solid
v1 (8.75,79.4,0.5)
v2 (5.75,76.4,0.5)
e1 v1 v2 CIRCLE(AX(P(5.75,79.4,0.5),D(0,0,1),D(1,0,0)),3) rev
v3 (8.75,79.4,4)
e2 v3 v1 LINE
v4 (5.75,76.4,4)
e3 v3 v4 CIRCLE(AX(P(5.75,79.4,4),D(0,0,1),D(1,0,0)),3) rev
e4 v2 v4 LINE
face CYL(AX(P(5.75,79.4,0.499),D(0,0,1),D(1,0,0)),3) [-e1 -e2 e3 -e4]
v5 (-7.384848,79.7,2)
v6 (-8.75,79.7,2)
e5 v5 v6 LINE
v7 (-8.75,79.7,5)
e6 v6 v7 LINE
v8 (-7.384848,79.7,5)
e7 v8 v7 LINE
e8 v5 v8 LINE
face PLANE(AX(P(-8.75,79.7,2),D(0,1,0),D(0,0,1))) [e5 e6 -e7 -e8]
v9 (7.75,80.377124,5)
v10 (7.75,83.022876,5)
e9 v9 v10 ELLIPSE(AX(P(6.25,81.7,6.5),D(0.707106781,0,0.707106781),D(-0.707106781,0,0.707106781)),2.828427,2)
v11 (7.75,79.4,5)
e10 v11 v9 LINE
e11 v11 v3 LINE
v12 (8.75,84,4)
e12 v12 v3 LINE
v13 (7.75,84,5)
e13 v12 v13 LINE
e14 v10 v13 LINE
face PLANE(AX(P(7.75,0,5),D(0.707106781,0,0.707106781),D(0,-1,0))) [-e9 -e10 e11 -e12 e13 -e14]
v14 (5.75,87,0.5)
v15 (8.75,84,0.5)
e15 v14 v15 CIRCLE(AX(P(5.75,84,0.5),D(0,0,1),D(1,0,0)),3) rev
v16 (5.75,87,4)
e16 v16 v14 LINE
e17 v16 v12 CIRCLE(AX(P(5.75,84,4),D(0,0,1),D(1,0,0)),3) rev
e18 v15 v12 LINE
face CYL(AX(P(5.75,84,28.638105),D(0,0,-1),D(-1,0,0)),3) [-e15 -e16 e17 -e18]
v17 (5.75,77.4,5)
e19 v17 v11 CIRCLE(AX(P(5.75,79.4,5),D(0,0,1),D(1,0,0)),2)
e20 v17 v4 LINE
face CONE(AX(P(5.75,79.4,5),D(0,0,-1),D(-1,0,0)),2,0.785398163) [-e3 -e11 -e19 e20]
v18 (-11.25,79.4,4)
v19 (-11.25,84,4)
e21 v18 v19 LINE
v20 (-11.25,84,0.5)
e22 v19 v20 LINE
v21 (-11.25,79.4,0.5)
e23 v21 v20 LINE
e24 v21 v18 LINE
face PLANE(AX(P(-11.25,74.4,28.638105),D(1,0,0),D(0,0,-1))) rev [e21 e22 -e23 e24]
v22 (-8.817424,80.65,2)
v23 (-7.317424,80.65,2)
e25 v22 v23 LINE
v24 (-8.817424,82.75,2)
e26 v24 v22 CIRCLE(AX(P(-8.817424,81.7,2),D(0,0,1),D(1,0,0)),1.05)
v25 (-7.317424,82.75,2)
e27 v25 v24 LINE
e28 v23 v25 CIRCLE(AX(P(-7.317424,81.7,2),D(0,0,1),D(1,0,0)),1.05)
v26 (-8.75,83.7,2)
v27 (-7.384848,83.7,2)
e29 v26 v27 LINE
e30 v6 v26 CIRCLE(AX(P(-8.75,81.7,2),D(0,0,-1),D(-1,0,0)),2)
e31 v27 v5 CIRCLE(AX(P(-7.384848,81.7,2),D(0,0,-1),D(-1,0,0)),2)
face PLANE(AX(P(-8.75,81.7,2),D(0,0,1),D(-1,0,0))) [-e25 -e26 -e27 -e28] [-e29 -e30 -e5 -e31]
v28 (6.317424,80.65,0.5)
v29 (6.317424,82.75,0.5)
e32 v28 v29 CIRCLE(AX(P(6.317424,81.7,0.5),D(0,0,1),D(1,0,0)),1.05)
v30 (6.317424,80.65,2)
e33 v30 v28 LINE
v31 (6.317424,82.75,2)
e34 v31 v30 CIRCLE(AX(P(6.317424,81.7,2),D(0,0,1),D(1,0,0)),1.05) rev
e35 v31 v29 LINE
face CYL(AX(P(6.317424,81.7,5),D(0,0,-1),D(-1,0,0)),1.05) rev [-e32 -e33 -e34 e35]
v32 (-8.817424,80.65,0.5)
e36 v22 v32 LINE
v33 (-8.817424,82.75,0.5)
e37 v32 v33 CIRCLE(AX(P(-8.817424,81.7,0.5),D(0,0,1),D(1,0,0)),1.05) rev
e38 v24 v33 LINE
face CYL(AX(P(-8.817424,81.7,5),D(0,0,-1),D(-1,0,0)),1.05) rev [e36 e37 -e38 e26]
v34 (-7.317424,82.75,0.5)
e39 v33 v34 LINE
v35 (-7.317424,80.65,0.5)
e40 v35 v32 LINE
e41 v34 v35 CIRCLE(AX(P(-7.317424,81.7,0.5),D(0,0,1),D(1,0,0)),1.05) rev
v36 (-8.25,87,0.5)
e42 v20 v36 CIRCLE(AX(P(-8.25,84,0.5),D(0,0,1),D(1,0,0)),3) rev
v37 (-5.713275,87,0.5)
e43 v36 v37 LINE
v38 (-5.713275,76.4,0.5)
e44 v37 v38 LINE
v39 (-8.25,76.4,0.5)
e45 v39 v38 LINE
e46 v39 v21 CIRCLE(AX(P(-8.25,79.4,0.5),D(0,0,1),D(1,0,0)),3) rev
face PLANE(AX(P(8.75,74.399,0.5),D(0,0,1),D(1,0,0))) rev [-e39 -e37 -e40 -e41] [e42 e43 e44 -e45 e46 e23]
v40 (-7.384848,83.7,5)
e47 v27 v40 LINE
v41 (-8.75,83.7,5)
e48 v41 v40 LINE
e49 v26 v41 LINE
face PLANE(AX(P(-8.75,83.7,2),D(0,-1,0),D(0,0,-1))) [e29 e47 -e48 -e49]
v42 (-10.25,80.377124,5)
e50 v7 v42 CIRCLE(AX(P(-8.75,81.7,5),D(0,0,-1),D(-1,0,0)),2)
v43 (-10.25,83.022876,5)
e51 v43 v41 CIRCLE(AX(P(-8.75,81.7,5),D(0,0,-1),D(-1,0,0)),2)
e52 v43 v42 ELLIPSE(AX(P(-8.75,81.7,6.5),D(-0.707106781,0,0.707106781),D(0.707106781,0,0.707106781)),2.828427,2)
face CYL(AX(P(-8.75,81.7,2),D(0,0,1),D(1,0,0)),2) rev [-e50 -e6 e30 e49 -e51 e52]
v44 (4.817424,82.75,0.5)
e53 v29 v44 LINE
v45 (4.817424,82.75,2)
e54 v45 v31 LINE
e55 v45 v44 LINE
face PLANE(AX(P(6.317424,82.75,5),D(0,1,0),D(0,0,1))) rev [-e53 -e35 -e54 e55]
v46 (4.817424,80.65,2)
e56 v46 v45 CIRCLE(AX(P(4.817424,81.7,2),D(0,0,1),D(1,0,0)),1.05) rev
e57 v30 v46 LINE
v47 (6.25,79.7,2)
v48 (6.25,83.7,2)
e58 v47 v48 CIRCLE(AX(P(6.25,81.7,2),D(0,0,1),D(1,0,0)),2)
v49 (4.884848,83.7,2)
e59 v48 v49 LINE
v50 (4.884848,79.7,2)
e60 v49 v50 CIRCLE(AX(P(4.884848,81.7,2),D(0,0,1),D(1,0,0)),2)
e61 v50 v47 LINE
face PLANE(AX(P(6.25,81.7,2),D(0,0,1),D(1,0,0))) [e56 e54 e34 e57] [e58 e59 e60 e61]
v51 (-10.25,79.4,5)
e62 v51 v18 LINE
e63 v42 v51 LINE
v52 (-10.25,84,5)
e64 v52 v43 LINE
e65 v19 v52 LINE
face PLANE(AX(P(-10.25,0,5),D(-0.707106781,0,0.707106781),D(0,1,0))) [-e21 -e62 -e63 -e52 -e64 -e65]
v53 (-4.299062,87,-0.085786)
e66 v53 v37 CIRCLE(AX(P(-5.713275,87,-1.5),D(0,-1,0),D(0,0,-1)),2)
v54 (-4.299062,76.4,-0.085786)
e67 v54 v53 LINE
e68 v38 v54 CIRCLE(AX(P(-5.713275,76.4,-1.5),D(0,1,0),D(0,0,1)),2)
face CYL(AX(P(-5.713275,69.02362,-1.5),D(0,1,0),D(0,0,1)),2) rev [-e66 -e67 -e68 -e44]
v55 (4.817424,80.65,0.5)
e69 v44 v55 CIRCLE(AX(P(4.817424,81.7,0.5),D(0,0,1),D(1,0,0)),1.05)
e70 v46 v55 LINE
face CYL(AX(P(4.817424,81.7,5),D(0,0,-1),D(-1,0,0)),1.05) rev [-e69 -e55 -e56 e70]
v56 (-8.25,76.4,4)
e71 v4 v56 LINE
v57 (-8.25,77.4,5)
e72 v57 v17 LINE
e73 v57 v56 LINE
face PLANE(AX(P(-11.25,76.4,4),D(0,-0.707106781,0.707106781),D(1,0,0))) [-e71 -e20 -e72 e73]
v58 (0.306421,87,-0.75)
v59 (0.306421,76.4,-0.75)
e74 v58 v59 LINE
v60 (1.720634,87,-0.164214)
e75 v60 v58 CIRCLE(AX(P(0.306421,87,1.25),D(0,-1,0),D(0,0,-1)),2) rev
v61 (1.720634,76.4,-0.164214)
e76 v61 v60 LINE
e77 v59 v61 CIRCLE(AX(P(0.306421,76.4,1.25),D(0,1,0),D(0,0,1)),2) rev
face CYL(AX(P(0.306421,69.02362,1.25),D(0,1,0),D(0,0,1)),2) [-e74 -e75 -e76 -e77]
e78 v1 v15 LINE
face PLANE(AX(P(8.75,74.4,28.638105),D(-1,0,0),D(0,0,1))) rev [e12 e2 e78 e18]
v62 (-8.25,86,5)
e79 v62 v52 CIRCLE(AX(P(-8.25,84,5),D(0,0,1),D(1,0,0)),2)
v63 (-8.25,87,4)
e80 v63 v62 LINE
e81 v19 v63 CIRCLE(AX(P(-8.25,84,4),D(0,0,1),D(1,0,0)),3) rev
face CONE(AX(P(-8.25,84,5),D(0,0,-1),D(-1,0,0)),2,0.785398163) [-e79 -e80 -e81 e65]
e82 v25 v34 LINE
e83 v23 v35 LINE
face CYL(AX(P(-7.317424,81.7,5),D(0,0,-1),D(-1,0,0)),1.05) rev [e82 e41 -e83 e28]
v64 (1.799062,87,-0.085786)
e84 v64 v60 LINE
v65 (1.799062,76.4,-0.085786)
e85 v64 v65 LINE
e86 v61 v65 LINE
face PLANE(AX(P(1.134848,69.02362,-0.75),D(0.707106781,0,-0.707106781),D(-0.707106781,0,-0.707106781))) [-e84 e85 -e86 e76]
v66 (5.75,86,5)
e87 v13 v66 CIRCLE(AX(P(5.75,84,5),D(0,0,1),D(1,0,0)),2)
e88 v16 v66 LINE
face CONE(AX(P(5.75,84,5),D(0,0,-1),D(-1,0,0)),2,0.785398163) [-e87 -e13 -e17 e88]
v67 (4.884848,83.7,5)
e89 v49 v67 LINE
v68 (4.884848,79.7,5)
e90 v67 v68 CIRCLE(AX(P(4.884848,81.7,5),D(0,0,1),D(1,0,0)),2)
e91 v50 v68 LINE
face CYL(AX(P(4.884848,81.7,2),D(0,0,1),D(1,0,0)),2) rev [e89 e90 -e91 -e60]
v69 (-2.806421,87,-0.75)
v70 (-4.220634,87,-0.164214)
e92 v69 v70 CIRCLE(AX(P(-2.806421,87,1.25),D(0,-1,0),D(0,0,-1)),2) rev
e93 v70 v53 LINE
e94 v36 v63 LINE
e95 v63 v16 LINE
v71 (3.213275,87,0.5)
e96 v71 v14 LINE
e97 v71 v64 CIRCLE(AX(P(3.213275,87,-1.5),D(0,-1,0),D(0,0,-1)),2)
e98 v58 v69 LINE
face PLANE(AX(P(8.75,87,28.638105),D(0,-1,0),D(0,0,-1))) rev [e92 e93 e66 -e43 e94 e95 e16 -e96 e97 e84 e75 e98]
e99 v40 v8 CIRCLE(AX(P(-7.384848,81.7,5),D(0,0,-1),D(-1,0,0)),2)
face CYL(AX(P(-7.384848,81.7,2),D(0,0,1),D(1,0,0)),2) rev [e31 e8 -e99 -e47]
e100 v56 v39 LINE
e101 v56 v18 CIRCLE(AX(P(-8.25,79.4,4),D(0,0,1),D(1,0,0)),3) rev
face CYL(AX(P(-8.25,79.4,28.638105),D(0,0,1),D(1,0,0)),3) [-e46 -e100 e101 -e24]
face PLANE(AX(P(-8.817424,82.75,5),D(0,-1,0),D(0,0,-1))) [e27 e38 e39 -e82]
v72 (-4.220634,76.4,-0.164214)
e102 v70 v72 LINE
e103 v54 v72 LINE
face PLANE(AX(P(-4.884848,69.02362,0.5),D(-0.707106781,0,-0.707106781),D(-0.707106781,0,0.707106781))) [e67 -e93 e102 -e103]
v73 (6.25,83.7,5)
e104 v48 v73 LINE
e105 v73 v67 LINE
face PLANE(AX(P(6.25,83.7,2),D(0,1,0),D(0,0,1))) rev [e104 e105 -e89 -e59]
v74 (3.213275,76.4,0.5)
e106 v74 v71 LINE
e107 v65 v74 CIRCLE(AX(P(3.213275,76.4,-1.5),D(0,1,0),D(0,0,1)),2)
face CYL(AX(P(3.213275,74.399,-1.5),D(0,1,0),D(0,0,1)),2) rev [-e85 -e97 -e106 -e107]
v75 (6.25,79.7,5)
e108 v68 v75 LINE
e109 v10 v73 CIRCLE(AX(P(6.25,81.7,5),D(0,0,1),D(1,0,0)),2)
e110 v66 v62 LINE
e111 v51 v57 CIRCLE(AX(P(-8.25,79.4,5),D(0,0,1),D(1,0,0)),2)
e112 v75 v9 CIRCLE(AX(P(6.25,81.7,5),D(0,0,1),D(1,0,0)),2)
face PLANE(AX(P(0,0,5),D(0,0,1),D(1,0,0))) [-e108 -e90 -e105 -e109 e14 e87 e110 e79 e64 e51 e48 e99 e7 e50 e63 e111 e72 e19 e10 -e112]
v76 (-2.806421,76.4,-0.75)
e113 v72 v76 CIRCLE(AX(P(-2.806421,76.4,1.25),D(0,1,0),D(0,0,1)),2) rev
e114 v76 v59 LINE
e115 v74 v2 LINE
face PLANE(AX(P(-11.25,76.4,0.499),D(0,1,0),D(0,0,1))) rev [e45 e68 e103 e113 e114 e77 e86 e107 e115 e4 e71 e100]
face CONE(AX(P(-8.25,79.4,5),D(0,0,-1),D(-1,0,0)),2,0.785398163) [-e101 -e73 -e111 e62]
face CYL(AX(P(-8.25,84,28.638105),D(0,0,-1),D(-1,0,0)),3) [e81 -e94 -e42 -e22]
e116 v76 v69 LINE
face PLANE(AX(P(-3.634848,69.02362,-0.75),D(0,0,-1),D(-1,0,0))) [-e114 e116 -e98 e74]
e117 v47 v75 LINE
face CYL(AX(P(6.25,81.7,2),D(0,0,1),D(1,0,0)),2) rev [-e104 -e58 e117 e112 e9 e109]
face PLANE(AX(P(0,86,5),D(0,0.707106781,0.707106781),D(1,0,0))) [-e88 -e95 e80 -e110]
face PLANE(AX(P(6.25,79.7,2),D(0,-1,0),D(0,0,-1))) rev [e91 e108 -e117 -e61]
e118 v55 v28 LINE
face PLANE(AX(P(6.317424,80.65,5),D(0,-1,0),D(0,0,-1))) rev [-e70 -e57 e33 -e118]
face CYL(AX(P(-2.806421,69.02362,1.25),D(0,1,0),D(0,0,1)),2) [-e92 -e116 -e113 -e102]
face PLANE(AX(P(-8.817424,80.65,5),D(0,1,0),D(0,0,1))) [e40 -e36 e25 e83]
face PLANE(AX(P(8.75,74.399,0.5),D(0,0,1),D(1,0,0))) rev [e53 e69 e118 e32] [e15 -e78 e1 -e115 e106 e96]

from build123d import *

# Parameters (mm, degrees)
SKETCH1_W           = 20
SKETCH1_H           = 12.6
BOSS_EXTRUDE1_DEPTH = 5
CUT_EXTRUDE1_REACH  = 19.616
SKETCH2_W           = 20
SKETCH2_H           = 0.5
CUT_EXTRUDE2_REACH  = 89.84
SKETCH3_W           = 20
SKETCH3_H           = 2
BOSS_EXTRUDE2_DEPTH = 10.6
CUT_EXTRUDE4_DEPTH  = 88.839697745
FILLET1_R           = 3
CUT_EXTRUDE5_DEPTH  = 3
CHAMFER2_SIZE       = 1
FILLET2_R           = 2


with BuildPart() as part:
    # Sketch1 → Boss-Extrude1 (new body)
    with BuildSketch(Plane.XY):
        with Locations((-1.25, 80.7)):
            Rectangle(SKETCH1_W, SKETCH1_H)
    extrude(amount=BOSS_EXTRUDE1_DEPTH)

    # Sketch2 → Cut-Extrude1 (cut, up to next)
    with BuildSketch(Plane(origin=(0, 87, 0), x_dir=(1, 0, 0), z_dir=(0, 1, 0)), mode=Mode.PRIVATE) as cut_extrude1_sk1:
        with Locations((-1.25, -0.25)):
            Rectangle(SKETCH2_W, SKETCH2_H)
    cut_extrude1_tool1 = extrude(cut_extrude1_sk1.sketch, amount=-CUT_EXTRUDE1_REACH, mode=Mode.PRIVATE) & part.part
    add(cut_extrude1_tool1.solids().sort_by_distance((-1.25, 87, 0.25))[0], mode=Mode.SUBTRACT)

    # Sketch3 → Cut-Extrude2 (cut, up to next)
    with BuildSketch(Plane.XY.offset(5), mode=Mode.PRIVATE) as cut_extrude2_sk1:
        with Locations((-1.25, 75.4)):
            Rectangle(SKETCH3_W, SKETCH3_H)
    cut_extrude2_tool1 = extrude(cut_extrude2_sk1.sketch, amount=-CUT_EXTRUDE2_REACH, mode=Mode.PRIVATE) & part.part
    add(cut_extrude2_tool1.solids().sort_by_distance((-1.25, 75.4, 5))[0], mode=Mode.SUBTRACT)

    # Sketch4 → Boss-Extrude2 (add)
    with BuildSketch(Plane(origin=(0, 87, 0), x_dir=(1, 0, 0), z_dir=(0, 1, 0))):
        Polygon((-4.884848004, -0.5), (-3.634848004, 0.75), (1.134848004, 0.75), (2.384848004, -0.5), align=None)
    extrude(amount=-BOSS_EXTRUDE2_DEPTH)

    # Sketch6 → Cut-Extrude4 (cut, symmetric)
    with BuildSketch(Plane(origin=(0, 0, 0.5), x_dir=(-1, 0, 0), z_dir=(0, 0, -1))):
        with BuildLine():
            Line((-6.317424002, 82.75), (-4.817424002, 82.75))
            ThreePointArc((-4.817424002, 82.75), (-3.767424002, 81.7), (-4.817424002, 80.65))
            Line((-4.817424002, 80.65), (-6.317424002, 80.65))
            ThreePointArc((-6.317424002, 80.65), (-7.367424002, 81.7), (-6.317424002, 82.75))
        make_face()
    cut_extrude4 = extrude(amount=CUT_EXTRUDE4_DEPTH, both=True, mode=Mode.SUBTRACT)

    # Fillet1
    fillet1_edges = [part.edges().sort_by_distance(p)[0] for p in [
        (-11.25, 87, 2.75),
        (-11.25, 76.4, 2.75),
        (8.75, 76.4, 2.75),
        (8.75, 87, 2.75),
    ]]
    fillet(fillet1_edges, radius=FILLET1_R)

    # Sketch7 → Cut-Extrude5 (cut)
    with BuildSketch(Plane.XY.offset(5)):
        with BuildLine():
            Line((6.25, 79.7), (4.884848004, 79.7))
            ThreePointArc((4.884848004, 79.7), (2.884848004, 81.7), (4.884848004, 83.7))
            Line((4.884848004, 83.7), (6.25, 83.7))
            ThreePointArc((6.25, 83.7), (8.25, 81.7), (6.25, 79.7))
        make_face()
    cut_extrude5 = extrude(amount=-CUT_EXTRUDE5_DEPTH, mode=Mode.SUBTRACT)

    # Mirror1: Cut-Extrude4, Cut-Extrude5 across plane
    add(cut_extrude4.mirror(Plane(origin=(-1.25, 0, 0), x_dir=(0, 0, 1), z_dir=(1, 0, 0))), mode=Mode.SUBTRACT)
    add(cut_extrude5.mirror(Plane(origin=(-1.25, 0, 0), x_dir=(0, 0, 1), z_dir=(1, 0, 0))), mode=Mode.SUBTRACT)

    # Chamfer2
    # the kernel refuses this chamfer: 1 mm, written as the material it takes off along each edge
    with BuildSketch(Plane(origin=(5.75, 76.4, 5), x_dir=(0, -0.02749587661058217, -0.9996219169112968), z_dir=(-1, 0, 0)), Plane(origin=(-8.25, 87, 5), x_dir=(0, 0.02749587661058217, -0.9996219169112968), z_dir=(1, 0, 0))) as chamfer2_piece_1:
        Polygon((CHAMFER2_SIZE * 0.999621916911, -CHAMFER2_SIZE * 0.0274958766106), (-CHAMFER2_SIZE * 0.0274958766106, -CHAMFER2_SIZE * 0.999621916911), (0, 0), align=None)
    extrude(amount=14, mode=Mode.SUBTRACT)
    with BuildSketch(Plane(origin=(8.75, 84, 5), x_dir=(-0.9996219169112968, 0, 0.02749587661058651), z_dir=(0, -1, 0))) as chamfer2_piece_2:
        Polygon((CHAMFER2_SIZE * 0.999621916911, CHAMFER2_SIZE * 0.0274958766106), (-CHAMFER2_SIZE * 0.0274958766106, CHAMFER2_SIZE * 0.999621916911), (0, 0), align=None)
    extrude(amount=4.6, mode=Mode.SUBTRACT)
    with BuildSketch(Plane(origin=(-11.25, 79.4, 5), x_dir=(-0.027495876610585623, 0, -0.9996219169112968), z_dir=(0, 1, 0))) as chamfer2_piece_3:
        Polygon((CHAMFER2_SIZE * 0.999621916911, -CHAMFER2_SIZE * 0.0274958766106), (-CHAMFER2_SIZE * 0.0274958766106, -CHAMFER2_SIZE * 0.999621916911), (0, 0), align=None)
    extrude(amount=4.6, mode=Mode.SUBTRACT)
    with BuildSketch(Plane(origin=(5.75, 84, 5), x_dir=(0, 1, 0), z_dir=(-1, 0, 0))) as chamfer2_piece_4:
        Polygon((3 - CHAMFER2_SIZE, 0), (3, CHAMFER2_SIZE), (3, 0), align=None)
    revolve(axis=Axis((5.75, 84, 5), (0, 0, -1)), revolution_arc=90, mode=Mode.SUBTRACT)
    with BuildSketch(Plane(origin=(-8.25, 84, 5), x_dir=(0, 1, 0), z_dir=(1, 0, 0))) as chamfer2_piece_5:
        Polygon((3, -CHAMFER2_SIZE), (3 - CHAMFER2_SIZE, 0), (3, 0), align=None)
    revolve(axis=Axis((-8.25, 84, 5), (0, 0, 1)), revolution_arc=90, mode=Mode.SUBTRACT)
    with BuildSketch(Plane(origin=(-8.25, 79.4, 5), x_dir=(0, -1, 0), z_dir=(1, 0, 0))) as chamfer2_piece_6:
        Polygon((3, CHAMFER2_SIZE), (3 - CHAMFER2_SIZE, 0), (3, 0), align=None)
    revolve(axis=Axis((-8.25, 79.4, 5), (0, 0, -1)), revolution_arc=90, mode=Mode.SUBTRACT)
    with BuildSketch(Plane(origin=(5.75, 79.4, 5), x_dir=(0, -1, 0), z_dir=(-1, 0, 0))) as chamfer2_piece_7:
        Polygon((3 - CHAMFER2_SIZE, 0), (3, -CHAMFER2_SIZE), (3, 0), align=None)
    revolve(axis=Axis((5.75, 79.4, 5), (0, 0, 1)), revolution_arc=90, mode=Mode.SUBTRACT)

    # Fillet2
    fillet2_edges = [part.edges().sort_by_distance(p)[0] for p in [
        (2.384848004, 81.7, 0.5),
        (-4.884848004, 81.7, 0.5),
        (-3.634848004, 81.7, -0.75),
        (1.134848004, 81.7, -0.75),
    ]]
    fillet(fillet2_edges, radius=FILLET2_R)


solid = part.part
